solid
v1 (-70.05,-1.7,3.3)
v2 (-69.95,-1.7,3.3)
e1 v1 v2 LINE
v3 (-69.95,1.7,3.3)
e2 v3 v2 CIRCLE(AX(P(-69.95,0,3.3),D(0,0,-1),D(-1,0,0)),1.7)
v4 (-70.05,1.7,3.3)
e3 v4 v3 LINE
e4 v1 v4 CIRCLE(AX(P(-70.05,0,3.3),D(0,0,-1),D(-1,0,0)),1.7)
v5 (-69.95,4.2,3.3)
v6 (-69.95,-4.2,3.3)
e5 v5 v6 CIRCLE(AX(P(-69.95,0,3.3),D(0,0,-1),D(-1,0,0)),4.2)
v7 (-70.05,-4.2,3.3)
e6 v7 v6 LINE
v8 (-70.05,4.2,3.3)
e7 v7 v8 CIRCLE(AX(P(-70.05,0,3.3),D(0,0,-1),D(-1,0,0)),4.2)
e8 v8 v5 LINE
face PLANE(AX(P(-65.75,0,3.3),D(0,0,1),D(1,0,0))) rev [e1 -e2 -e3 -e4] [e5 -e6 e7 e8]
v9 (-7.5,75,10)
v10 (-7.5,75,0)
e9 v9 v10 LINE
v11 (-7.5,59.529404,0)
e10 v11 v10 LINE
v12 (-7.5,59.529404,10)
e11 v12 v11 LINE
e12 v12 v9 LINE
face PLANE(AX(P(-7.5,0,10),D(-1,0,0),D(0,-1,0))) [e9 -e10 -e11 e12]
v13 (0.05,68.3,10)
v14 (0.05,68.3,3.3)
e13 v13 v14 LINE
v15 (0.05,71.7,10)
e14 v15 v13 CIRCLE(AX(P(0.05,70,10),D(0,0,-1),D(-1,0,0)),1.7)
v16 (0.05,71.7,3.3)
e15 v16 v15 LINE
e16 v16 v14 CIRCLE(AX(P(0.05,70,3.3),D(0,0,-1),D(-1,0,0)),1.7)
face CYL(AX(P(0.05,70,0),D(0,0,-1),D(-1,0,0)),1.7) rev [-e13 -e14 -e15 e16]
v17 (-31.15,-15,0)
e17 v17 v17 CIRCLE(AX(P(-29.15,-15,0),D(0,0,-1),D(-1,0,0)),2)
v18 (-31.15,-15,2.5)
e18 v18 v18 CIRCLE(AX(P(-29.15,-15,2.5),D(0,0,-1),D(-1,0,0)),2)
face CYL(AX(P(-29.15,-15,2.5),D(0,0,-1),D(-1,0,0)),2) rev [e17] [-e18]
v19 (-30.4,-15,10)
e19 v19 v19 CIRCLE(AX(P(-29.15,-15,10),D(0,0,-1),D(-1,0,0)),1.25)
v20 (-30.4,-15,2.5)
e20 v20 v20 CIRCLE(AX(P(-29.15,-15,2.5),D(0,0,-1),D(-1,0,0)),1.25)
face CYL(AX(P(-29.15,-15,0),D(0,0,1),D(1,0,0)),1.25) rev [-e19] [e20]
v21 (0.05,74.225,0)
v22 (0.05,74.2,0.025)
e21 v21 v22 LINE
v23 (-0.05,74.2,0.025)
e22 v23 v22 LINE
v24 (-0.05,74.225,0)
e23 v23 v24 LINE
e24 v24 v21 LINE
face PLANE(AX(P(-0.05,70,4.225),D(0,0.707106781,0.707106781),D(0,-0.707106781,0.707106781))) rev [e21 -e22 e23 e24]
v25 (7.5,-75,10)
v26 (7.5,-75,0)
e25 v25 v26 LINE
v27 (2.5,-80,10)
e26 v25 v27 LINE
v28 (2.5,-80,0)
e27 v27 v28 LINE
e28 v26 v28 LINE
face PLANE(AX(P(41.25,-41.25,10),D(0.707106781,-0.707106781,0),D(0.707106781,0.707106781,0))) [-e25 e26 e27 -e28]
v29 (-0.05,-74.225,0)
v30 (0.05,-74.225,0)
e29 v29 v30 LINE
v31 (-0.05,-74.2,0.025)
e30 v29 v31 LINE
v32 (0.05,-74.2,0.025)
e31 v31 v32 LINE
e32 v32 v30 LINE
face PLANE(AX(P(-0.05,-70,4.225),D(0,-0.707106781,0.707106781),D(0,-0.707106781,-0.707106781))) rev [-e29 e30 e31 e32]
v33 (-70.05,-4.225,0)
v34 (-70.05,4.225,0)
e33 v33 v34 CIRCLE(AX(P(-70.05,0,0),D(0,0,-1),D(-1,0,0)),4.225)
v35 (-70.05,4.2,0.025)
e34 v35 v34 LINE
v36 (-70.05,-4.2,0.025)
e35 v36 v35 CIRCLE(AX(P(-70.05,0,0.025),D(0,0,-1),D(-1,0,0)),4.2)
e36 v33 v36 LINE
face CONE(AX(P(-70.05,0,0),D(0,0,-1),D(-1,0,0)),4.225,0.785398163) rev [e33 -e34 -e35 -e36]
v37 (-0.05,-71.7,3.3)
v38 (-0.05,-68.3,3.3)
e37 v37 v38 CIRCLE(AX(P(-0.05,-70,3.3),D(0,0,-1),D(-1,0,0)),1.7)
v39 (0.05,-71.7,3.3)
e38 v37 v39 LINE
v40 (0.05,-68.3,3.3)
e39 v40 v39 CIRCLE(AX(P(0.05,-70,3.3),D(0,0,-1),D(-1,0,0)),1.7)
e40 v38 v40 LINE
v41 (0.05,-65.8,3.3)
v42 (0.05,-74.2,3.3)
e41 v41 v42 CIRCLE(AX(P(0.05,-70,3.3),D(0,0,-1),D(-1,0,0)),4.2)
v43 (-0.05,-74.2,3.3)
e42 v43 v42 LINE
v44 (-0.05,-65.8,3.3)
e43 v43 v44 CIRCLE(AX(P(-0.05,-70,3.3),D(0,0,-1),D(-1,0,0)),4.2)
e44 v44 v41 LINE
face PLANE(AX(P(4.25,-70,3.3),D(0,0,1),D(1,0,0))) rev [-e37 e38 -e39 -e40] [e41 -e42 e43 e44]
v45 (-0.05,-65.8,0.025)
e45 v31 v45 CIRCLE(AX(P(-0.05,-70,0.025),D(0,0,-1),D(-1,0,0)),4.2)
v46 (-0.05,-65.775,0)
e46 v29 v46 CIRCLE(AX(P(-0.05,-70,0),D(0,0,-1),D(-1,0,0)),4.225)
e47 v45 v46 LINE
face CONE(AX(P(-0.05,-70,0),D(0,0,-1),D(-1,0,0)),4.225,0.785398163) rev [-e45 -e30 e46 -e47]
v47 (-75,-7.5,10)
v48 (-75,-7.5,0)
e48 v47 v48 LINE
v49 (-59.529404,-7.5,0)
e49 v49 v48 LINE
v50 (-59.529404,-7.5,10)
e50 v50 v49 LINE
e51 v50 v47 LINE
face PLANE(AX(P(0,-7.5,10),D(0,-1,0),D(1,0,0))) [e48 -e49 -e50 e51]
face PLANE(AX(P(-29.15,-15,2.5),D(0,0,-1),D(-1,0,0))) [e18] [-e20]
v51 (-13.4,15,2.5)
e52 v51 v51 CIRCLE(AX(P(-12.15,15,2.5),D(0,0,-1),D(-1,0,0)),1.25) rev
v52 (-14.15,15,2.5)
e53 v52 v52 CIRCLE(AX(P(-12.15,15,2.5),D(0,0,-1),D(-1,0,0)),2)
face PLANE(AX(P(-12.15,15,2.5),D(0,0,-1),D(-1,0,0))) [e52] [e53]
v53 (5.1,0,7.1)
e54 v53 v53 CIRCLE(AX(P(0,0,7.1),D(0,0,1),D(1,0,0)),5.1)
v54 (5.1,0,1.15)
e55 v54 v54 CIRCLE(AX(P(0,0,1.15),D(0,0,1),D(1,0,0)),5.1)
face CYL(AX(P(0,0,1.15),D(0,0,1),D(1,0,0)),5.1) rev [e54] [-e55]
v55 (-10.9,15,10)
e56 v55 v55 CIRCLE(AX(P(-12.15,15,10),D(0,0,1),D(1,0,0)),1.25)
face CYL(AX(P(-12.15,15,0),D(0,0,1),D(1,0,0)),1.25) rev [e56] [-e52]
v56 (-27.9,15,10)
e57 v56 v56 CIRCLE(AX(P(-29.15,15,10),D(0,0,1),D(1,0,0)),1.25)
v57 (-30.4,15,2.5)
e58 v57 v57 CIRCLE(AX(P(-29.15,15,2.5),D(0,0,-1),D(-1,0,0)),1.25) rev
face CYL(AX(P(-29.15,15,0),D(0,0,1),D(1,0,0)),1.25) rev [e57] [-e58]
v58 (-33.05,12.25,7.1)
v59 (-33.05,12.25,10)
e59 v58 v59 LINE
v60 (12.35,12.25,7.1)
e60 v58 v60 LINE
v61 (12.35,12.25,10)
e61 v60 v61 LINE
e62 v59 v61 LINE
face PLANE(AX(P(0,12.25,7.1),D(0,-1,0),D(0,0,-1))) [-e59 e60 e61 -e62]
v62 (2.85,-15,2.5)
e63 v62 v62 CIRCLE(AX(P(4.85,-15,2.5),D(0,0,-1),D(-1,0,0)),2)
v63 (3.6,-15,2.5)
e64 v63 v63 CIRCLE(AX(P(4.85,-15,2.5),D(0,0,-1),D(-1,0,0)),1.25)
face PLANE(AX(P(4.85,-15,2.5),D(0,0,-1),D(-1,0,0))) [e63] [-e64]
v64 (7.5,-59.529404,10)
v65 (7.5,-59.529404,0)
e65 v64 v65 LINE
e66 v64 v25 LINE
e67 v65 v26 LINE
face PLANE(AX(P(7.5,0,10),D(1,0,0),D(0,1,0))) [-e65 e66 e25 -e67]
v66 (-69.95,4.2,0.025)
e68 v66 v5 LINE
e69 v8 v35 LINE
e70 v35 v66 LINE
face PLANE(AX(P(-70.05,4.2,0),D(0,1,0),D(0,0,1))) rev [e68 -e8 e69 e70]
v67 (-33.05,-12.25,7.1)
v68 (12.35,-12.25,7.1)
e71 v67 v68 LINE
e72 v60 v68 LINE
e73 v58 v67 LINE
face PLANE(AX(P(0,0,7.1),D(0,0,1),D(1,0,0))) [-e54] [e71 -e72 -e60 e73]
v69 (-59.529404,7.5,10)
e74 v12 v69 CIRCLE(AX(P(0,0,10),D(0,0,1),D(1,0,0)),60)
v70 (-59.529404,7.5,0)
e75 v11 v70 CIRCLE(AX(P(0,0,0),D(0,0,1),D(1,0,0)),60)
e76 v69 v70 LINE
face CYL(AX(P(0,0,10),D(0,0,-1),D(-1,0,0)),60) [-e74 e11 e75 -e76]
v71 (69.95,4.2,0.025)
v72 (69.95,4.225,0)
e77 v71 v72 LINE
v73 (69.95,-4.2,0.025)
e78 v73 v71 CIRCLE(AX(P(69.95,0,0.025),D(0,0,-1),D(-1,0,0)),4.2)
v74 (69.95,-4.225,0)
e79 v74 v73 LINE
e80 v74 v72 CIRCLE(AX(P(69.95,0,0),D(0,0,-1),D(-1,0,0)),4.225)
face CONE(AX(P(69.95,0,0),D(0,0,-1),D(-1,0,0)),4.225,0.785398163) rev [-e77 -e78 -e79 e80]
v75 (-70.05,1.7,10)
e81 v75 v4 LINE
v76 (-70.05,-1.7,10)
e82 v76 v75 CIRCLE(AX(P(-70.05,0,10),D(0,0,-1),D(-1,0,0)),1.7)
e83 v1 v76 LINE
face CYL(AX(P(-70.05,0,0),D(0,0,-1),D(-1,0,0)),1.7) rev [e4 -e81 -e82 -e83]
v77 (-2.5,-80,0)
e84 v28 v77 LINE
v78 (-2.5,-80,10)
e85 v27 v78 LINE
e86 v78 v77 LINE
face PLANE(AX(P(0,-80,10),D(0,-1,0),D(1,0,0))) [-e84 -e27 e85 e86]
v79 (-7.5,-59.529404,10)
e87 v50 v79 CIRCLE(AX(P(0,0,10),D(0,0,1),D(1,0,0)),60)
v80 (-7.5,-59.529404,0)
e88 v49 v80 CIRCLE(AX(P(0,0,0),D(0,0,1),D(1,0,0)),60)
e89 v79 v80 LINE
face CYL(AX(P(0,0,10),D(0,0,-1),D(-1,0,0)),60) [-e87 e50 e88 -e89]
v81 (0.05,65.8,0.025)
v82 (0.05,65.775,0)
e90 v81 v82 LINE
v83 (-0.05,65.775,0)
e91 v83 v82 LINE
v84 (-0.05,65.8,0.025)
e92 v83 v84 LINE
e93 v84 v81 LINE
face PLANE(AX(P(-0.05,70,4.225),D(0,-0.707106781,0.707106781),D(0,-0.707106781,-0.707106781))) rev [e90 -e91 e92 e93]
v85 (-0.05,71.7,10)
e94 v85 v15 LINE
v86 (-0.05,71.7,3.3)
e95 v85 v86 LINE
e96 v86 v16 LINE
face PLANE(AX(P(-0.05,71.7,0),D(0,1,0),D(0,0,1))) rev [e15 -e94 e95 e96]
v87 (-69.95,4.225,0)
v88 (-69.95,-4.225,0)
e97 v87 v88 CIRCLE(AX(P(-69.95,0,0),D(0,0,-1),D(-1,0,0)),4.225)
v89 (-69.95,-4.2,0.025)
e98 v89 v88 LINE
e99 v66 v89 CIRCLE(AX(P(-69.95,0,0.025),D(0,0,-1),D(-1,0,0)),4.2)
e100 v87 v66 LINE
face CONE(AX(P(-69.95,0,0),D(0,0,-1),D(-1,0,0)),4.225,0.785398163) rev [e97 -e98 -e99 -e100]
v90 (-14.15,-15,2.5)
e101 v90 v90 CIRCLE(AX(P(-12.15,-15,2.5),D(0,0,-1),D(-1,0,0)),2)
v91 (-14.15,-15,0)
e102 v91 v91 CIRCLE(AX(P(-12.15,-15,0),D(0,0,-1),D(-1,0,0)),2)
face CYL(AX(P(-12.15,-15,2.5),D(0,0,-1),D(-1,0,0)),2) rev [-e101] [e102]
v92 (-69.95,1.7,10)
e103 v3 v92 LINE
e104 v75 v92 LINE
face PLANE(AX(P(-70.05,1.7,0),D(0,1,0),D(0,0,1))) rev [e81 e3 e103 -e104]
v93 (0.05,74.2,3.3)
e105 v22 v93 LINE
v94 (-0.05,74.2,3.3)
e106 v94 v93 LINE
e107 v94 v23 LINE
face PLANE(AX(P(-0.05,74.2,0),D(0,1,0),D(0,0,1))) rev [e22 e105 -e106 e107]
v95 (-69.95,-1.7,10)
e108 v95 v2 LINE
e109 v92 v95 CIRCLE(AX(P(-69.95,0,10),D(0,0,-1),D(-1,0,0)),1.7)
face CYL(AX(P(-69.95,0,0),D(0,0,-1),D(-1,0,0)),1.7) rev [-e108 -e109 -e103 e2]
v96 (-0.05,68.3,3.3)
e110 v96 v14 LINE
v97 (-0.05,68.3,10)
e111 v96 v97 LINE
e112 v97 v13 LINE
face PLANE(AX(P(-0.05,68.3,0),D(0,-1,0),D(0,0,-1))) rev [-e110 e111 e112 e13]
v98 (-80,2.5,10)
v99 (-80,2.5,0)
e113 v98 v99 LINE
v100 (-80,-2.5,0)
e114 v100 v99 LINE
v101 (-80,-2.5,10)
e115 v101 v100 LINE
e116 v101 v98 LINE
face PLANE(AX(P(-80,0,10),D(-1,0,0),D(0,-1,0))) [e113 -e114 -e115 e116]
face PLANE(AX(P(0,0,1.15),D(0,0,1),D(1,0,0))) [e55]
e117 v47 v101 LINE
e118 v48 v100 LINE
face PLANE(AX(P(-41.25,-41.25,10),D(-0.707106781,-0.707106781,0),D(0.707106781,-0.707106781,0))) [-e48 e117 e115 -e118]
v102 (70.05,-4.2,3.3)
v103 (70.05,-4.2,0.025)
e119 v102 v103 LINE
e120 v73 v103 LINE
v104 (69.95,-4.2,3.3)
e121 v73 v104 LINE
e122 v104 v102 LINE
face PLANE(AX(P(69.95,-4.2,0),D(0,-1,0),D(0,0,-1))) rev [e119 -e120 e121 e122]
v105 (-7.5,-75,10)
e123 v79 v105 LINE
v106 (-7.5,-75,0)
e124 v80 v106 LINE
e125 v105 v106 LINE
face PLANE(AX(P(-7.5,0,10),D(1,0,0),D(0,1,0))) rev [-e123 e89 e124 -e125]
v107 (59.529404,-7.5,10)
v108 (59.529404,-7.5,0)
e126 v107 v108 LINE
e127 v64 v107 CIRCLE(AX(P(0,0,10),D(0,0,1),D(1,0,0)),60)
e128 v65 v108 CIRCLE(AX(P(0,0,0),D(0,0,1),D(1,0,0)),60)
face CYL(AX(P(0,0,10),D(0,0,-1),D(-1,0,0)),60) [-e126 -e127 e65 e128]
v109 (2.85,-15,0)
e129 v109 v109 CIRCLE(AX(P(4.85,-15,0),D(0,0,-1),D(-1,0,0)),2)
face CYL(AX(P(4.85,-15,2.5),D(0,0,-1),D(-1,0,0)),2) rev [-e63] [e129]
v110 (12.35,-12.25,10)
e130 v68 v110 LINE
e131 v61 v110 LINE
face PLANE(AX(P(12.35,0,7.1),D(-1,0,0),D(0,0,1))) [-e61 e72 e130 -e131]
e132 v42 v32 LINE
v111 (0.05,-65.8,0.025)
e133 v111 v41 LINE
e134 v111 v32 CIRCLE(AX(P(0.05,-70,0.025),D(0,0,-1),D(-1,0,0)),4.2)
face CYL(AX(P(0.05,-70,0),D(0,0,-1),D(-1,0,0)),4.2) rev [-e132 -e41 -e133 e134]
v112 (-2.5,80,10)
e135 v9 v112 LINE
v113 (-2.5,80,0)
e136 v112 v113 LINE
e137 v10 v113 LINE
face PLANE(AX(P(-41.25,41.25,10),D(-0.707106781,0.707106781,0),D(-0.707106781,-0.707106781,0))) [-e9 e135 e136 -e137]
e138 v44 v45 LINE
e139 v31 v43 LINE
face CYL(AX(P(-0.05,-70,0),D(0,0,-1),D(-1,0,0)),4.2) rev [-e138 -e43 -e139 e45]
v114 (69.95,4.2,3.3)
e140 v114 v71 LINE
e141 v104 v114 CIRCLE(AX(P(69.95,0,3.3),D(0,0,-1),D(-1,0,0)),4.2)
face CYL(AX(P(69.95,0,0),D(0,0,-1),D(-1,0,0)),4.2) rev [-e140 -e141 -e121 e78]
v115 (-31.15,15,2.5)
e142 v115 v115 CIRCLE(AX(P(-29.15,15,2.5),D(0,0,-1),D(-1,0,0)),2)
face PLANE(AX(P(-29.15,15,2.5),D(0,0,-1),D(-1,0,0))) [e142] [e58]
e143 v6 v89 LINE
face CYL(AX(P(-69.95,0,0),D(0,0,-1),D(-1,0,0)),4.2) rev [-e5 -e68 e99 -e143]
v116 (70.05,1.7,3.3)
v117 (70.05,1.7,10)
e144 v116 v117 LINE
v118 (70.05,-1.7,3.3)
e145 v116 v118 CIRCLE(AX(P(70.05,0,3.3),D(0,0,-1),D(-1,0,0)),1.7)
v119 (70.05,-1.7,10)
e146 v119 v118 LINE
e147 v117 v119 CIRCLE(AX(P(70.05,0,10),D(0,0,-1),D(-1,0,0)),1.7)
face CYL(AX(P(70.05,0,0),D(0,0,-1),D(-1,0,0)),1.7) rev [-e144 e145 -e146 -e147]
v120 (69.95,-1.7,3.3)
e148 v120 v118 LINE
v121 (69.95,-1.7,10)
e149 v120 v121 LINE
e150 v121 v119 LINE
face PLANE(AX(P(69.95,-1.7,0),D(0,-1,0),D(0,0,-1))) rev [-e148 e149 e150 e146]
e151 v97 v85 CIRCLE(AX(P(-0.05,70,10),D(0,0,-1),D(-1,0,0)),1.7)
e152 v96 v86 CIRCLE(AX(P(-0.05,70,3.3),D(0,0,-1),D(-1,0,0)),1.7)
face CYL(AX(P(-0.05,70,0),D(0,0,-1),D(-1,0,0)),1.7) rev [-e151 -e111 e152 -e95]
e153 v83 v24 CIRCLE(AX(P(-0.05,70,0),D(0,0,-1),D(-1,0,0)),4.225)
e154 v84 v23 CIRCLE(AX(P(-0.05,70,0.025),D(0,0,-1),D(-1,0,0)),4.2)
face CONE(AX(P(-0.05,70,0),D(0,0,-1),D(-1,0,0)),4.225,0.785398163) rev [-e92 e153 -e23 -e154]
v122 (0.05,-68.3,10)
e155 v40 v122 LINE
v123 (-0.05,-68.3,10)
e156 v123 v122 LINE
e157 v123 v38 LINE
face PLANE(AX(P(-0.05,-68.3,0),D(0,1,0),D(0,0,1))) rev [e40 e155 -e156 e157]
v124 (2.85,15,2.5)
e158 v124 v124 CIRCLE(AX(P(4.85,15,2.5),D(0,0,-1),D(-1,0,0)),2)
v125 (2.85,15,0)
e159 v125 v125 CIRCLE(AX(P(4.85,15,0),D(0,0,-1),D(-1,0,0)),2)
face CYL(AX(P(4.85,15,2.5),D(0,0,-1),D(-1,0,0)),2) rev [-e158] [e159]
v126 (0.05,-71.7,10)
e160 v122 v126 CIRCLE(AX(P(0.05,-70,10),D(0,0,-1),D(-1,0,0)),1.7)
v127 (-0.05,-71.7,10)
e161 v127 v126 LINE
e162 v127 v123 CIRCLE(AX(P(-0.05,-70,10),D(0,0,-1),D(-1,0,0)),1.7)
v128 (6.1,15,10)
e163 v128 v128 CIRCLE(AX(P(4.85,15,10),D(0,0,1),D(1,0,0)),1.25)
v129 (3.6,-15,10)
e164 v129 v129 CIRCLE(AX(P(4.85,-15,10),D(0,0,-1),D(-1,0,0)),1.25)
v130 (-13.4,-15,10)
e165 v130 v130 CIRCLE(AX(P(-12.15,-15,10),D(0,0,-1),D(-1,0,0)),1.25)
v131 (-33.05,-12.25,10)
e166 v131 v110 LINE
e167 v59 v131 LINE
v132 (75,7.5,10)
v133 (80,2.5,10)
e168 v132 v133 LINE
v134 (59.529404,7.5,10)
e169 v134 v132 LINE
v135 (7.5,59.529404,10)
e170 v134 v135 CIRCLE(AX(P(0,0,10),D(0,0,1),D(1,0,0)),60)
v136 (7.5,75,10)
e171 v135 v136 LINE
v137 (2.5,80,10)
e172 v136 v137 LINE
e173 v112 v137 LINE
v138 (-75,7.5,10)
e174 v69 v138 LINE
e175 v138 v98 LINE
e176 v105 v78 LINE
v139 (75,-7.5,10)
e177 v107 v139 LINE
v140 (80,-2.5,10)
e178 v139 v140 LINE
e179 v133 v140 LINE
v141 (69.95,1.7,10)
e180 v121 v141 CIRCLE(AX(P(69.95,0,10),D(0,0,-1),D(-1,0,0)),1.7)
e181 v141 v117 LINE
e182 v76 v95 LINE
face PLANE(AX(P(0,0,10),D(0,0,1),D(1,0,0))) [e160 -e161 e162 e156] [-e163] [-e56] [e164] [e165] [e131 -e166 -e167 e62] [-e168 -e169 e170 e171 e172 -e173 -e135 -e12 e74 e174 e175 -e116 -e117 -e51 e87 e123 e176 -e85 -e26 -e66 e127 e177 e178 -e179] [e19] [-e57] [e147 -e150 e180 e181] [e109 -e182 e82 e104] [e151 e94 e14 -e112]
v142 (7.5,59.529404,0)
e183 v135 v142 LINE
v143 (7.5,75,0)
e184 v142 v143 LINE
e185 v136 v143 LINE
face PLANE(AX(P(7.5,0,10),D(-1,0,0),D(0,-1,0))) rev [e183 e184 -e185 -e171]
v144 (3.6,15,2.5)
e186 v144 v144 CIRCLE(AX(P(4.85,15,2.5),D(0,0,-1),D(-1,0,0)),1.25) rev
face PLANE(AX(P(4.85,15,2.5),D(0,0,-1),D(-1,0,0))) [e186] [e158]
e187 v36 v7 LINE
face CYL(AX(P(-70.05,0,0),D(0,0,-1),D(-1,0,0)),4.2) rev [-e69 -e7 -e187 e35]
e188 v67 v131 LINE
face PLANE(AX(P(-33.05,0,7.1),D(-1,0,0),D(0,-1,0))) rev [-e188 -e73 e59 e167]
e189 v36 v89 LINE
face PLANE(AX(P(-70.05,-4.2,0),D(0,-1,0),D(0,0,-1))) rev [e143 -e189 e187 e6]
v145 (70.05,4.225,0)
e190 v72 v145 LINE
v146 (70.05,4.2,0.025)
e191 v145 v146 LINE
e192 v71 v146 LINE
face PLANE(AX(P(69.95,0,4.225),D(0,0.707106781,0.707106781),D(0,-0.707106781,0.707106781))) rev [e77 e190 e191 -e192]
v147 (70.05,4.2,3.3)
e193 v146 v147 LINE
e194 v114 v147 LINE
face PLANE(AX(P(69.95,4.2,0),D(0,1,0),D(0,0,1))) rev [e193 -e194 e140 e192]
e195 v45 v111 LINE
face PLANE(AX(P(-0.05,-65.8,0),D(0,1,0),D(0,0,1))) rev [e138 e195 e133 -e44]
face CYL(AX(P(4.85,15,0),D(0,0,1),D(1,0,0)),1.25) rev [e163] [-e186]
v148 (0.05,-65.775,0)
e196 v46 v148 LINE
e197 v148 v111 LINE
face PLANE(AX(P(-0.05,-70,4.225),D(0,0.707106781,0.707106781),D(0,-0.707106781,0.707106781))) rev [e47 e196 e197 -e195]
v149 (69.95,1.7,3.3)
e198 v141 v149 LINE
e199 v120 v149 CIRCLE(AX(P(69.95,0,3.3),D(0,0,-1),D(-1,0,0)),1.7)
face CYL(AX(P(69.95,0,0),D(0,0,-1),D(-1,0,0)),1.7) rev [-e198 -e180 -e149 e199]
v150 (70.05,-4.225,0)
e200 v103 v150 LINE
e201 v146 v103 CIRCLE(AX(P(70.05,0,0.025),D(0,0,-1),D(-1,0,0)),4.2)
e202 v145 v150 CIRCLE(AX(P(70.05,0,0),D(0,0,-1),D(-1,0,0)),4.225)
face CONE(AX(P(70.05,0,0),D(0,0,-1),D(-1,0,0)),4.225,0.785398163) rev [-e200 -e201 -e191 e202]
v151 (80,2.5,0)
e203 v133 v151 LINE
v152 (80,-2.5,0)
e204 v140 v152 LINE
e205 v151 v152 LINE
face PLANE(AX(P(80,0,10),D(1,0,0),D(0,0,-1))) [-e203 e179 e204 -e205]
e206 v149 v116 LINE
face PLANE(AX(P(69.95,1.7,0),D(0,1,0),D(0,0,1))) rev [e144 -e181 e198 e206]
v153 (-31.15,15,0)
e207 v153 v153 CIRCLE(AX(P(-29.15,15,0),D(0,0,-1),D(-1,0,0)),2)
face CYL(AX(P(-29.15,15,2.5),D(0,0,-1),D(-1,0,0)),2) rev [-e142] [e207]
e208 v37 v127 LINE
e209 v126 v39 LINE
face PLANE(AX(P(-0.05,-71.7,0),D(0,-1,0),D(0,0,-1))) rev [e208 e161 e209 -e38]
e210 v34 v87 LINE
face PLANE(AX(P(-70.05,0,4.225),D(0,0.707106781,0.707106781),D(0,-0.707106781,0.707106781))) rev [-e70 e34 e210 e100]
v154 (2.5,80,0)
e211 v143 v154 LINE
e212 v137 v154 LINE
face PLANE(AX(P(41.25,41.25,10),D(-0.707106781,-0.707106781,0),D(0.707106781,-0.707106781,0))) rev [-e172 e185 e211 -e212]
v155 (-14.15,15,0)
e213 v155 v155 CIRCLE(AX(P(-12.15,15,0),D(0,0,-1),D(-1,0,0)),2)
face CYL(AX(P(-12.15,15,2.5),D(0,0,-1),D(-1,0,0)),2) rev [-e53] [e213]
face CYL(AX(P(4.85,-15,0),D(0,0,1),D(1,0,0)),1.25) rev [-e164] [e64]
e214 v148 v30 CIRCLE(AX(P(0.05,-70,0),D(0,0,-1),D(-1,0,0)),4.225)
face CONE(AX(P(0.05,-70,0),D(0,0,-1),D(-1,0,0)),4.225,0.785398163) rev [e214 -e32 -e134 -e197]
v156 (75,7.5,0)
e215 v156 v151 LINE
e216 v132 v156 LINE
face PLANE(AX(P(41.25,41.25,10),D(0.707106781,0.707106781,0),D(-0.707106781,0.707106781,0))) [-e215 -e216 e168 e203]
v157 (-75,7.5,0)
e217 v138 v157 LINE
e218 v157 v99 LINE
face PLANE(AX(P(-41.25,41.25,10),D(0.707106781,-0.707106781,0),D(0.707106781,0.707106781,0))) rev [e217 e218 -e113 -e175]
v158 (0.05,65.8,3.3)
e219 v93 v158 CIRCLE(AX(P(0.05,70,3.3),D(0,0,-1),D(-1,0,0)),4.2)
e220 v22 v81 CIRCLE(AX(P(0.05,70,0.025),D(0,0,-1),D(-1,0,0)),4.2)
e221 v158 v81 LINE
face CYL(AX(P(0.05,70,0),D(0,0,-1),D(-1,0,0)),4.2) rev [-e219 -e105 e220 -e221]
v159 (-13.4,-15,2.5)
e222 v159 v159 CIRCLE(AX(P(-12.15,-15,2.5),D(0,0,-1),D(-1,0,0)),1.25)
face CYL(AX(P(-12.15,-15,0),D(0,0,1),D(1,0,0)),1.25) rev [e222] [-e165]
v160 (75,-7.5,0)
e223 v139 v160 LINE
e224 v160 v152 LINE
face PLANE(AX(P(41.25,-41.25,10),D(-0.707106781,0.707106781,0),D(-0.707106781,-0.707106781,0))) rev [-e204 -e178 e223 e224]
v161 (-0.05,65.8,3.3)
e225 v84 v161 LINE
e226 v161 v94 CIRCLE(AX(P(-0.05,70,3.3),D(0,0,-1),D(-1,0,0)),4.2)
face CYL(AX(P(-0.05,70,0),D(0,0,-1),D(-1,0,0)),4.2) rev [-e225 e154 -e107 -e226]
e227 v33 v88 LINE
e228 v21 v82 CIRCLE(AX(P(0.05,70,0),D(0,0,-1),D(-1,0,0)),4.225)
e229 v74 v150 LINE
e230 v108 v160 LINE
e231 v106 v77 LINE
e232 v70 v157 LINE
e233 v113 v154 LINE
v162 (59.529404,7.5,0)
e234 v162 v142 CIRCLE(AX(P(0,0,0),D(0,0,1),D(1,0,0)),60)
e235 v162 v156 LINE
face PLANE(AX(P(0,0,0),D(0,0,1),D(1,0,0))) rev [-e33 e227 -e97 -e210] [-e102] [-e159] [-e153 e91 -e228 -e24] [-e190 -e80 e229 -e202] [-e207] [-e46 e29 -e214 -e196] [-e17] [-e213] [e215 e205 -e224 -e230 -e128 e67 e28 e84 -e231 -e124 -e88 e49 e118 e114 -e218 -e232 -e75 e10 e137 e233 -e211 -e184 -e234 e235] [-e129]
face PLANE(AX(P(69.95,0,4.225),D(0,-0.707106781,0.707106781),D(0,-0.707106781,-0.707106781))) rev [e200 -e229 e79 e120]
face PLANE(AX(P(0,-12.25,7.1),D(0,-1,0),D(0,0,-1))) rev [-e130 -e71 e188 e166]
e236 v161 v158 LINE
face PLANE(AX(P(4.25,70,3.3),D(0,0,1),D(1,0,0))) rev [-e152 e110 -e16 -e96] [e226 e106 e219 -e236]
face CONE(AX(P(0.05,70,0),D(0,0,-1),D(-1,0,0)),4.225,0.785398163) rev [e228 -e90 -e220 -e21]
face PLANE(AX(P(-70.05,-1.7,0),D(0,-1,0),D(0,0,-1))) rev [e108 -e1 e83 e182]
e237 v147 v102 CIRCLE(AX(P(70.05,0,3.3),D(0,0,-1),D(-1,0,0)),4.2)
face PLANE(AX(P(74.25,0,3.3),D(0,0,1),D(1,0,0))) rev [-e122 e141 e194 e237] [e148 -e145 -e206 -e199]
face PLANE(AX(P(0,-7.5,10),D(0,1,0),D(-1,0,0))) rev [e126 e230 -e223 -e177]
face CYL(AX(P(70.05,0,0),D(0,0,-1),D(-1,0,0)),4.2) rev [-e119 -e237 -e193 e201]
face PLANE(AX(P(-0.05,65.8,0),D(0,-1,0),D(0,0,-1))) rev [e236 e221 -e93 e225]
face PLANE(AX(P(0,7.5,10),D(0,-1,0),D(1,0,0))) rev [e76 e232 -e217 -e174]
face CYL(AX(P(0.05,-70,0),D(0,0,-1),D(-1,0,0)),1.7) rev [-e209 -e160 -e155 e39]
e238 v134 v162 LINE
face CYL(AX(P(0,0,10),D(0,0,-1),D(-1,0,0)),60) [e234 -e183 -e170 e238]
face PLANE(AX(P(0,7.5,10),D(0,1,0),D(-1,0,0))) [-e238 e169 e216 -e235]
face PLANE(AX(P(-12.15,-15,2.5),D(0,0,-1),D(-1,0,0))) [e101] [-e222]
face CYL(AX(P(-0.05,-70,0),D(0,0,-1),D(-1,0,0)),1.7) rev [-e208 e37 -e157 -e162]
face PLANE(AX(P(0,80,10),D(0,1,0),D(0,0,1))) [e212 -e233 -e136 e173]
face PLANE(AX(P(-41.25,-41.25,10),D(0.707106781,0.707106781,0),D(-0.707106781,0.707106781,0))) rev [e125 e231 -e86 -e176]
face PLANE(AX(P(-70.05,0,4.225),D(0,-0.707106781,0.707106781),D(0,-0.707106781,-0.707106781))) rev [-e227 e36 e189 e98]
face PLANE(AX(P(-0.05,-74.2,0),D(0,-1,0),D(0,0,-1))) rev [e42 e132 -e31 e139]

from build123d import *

# Parameters (mm, degrees)
BOSS_EXTRUDE1_DEPTH                            = 10
CBORE_START                                    = -1
CBORE_SLOT_FOR_M3_HEX_HEAD_MACHINE_SCREW_DEPTH = 4.3
CBORE_START_2                                  = 3.3
CBORE_SLOT_FOR_M3_HEX_HEAD_MACHINE_S_3_DEPTH   = 7.7
SKETCH12_R                                     = 1.25
CUT_EXTRUDE4_DEPTH                             = 114.578166925
SKETCH12_5_R                                   = 5.1
CUT_EXTRUDE5_DEPTH                             = 8.85
SKETCH12_6_W                                   = 45.4
SKETCH12_6_H                                   = 24.5
CUT_EXTRUDE6_DEPTH                             = 2.9
SKETCH16_R                                     = 2
CUT_EXTRUDE7_DEPTH                             = 2.5


with BuildPart() as part:
    # Sketch1 → Boss-Extrude1 (new body)
    with BuildSketch(Plane.XY):
        with BuildLine():
            Line((-59.529404499, 7.5), (-75, 7.5))
            Line((-75, 7.5), (-80, 2.5))
            Line((-80, 2.5), (-80, -2.5))
            Line((-80, -2.5), (-75, -7.5))
            Line((-75, -7.5), (-59.529404499, -7.5))
            ThreePointArc((-59.529404499, -7.5), (-42.426406871, -42.426406871), (-7.5, -59.529404499))
            Line((-7.5, -59.529404499), (-7.5, -75))
            Line((-7.5, -75), (-2.5, -80))
            Line((-2.5, -80), (2.5, -80))
            Line((2.5, -80), (7.5, -75))
            Line((7.5, -75), (7.5, -59.529404499))
            ThreePointArc((7.5, -59.529404499), (42.426406871, -42.426406871), (59.529404499, -7.5))
            Line((59.529404499, -7.5), (75, -7.5))
            Line((75, -7.5), (80, -2.5))
            Line((80, -2.5), (80, 2.5))
            Line((80, 2.5), (75, 7.5))
            Line((75, 7.5), (59.529404499, 7.5))
            ThreePointArc((59.529404499, 7.5), (42.426406871, 42.426406871), (7.5, 59.529404499))
            Line((7.5, 59.529404499), (7.5, 75))
            Line((7.5, 75), (2.5, 80))
            Line((2.5, 80), (-2.5, 80))
            Line((-2.5, 80), (-7.5, 75))
            Line((-7.5, 75), (-7.5, 59.529404499))
            ThreePointArc((-7.5, 59.529404499), (-42.426406871, 42.426406871), (-59.529404499, 7.5))
        make_face()
    extrude(amount=BOSS_EXTRUDE1_DEPTH)

    # CBORE SLOT for M3 Hex Head Machine Screw1: read off the stored shape, not the designer's step
    # CBORE SLOT for M3 Hex Head Machine S 2 → CBORE SLOT for M3 Hex Head Machine Screw1 (cut)
    with BuildSketch(Plane.XY.offset(CBORE_START)):
        with BuildLine():
            ThreePointArc((0.05, 65.8), (4.25, 70), (0.05, 74.2))
            Line((0.05, 74.2), (-0.05, 74.2))
            ThreePointArc((-0.05, 74.2), (-4.25, 70), (-0.05, 65.8))
            Line((-0.05, 65.8), (0.05, 65.8))
        make_face()
        with BuildLine():
            ThreePointArc((-69.95, -4.2), (-65.75, 0), (-69.95, 4.2))
            Line((-69.95, 4.2), (-70.05, 4.2))
            ThreePointArc((-70.05, 4.2), (-74.25, 0), (-70.05, -4.2))
            Line((-70.05, -4.2), (-69.95, -4.2))
        make_face()
        with BuildLine():
            ThreePointArc((69.95, 4.2), (65.75, 0), (69.95, -4.2))
            Line((69.95, -4.2), (70.05, -4.2))
            ThreePointArc((70.05, -4.2), (74.25, 0), (70.05, 4.2))
            Line((70.05, 4.2), (69.95, 4.2))
        make_face()
        with BuildLine():
            ThreePointArc((0.05, -74.2), (4.25, -70), (0.05, -65.8))
            Line((0.05, -65.8), (-0.05, -65.8))
            ThreePointArc((-0.05, -65.8), (-4.25, -70), (-0.05, -74.2))
            Line((-0.05, -74.2), (0.05, -74.2))
        make_face()
    extrude(amount=CBORE_SLOT_FOR_M3_HEX_HEAD_MACHINE_SCREW_DEPTH, mode=Mode.SUBTRACT)

    # CBORE SLOT for M3 Hex Head Machine S 3 o → CBORE SLOT for M3 Hex Head Machine S 3 (cut)
    with BuildSketch(Plane.XY.offset(CBORE_START_2)):
        with BuildLine():
            ThreePointArc((0.05, 68.3), (1.75, 70), (0.05, 71.7))
            Line((0.05, 71.7), (-0.05, 71.7))
            ThreePointArc((-0.05, 71.7), (-1.75, 70), (-0.05, 68.3))
            Line((-0.05, 68.3), (0.05, 68.3))
        make_face()
        with BuildLine():
            ThreePointArc((-69.95, -1.7), (-68.25, 0), (-69.95, 1.7))
            Line((-69.95, 1.7), (-70.05, 1.7))
            ThreePointArc((-70.05, 1.7), (-71.75, 0), (-70.05, -1.7))
            Line((-70.05, -1.7), (-69.95, -1.7))
        make_face()
        with BuildLine():
            ThreePointArc((69.95, 1.7), (68.25, 0), (69.95, -1.7))
            Line((69.95, -1.7), (70.05, -1.7))
            ThreePointArc((70.05, -1.7), (71.75, 0), (70.05, 1.7))
            Line((70.05, 1.7), (69.95, 1.7))
        make_face()
        with BuildLine():
            ThreePointArc((0.05, -71.7), (1.75, -70), (0.05, -68.3))
            Line((0.05, -68.3), (-0.05, -68.3))
            ThreePointArc((-0.05, -68.3), (-1.75, -70), (-0.05, -71.7))
            Line((-0.05, -71.7), (0.05, -71.7))
        make_face()
    extrude(amount=CBORE_SLOT_FOR_M3_HEX_HEAD_MACHINE_S_3_DEPTH, mode=Mode.SUBTRACT)

    # CBORE SLOT for M3 Hex Head Machine S 4: loft between two sections, ruled curve by curve
    cbore_slot_for_m3_hex_head_machine_s_4_from = [
        Edge.make_three_point_arc((0.05, 74.2, 0.025), (3.019848481, 72.969848481, 0.025), (4.25, 70, 0.025)),
        Edge.make_three_point_arc((4.25, 70, 0.025), (3.019848481, 67.030151519, 0.025), (0.05, 65.8, 0.025)),
        Edge.make_three_point_arc((-0.05, 65.8, 0.025), (-3.019848481, 67.030151519, 0.025), (-4.25, 70, 0.025)),
        Edge.make_three_point_arc((-4.25, 70, 0.025), (-3.019848481, 72.969848481, 0.025), (-0.05, 74.2, 0.025)),
        Edge.make_line((0.05, 65.8, 0.025), (-0.05, 65.8, 0.025)),
        Edge.make_line((0.05, 74.2, 0.025), (-0.05, 74.2, 0.025)),
    ]
    cbore_slot_for_m3_hex_head_machine_s_4_to = [
        Edge.make_three_point_arc((0.05, 74.225, 0), (3.037526151, 72.987526151, 0), (4.275, 70, 0)),
        Edge.make_three_point_arc((4.275, 70, 0), (3.037526151, 67.012473849, 0), (0.05, 65.775, 0)),
        Edge.make_three_point_arc((-0.05, 65.775, 0), (-3.037526151, 67.012473849, 0), (-4.275, 70, 0)),
        Edge.make_three_point_arc((-4.275, 70, 0), (-3.037526151, 72.987526151, 0), (-0.05, 74.225, 0)),
        Edge.make_line((0.05, 65.775, 0), (-0.05, 65.775, 0)),
        Edge.make_line((0.05, 74.225, 0), (-0.05, 74.225, 0)),
    ]
    cbore_slot_for_m3_hex_head_machine_s_4 = Solid(Shell([*[Face.make_surface_from_curves(cbore_slot_for_m3_hex_head_machine_s_4_from[k], cbore_slot_for_m3_hex_head_machine_s_4_to[k]) for k in range(6)], Face(Wire(cbore_slot_for_m3_hex_head_machine_s_4_from)), Face(Wire(cbore_slot_for_m3_hex_head_machine_s_4_to))]))
    add(cbore_slot_for_m3_hex_head_machine_s_4, mode=Mode.SUBTRACT)

    # CBORE SLOT for M3 Hex Head Machine S 5: loft between two sections, ruled curve by curve
    cbore_slot_for_m3_hex_head_machine_s_5_from = [
        Edge.make_three_point_arc((-69.95, 4.2, 0.025), (-66.980151519, 2.969848481, 0.025), (-65.75, 0, 0.025)),
        Edge.make_three_point_arc((-65.75, 0, 0.025), (-66.980151519, -2.969848481, 0.025), (-69.95, -4.2, 0.025)),
        Edge.make_three_point_arc((-70.05, -4.2, 0.025), (-73.019848481, -2.969848481, 0.025), (-74.25, 0, 0.025)),
        Edge.make_three_point_arc((-74.25, 0, 0.025), (-73.019848481, 2.969848481, 0.025), (-70.05, 4.2, 0.025)),
        Edge.make_line((-69.95, -4.2, 0.025), (-70.05, -4.2, 0.025)),
        Edge.make_line((-69.95, 4.2, 0.025), (-70.05, 4.2, 0.025)),
    ]
    cbore_slot_for_m3_hex_head_machine_s_5_to = [
        Edge.make_three_point_arc((-69.95, 4.225, 0), (-66.962473849, 2.987526151, 0), (-65.725, 0, 0)),
        Edge.make_three_point_arc((-65.725, 0, 0), (-66.962473849, -2.987526151, 0), (-69.95, -4.225, 0)),
        Edge.make_three_point_arc((-70.05, -4.225, 0), (-73.037526151, -2.987526151, 0), (-74.275, 0, 0)),
        Edge.make_three_point_arc((-74.275, 0, 0), (-73.037526151, 2.987526151, 0), (-70.05, 4.225, 0)),
        Edge.make_line((-69.95, -4.225, 0), (-70.05, -4.225, 0)),
        Edge.make_line((-69.95, 4.225, 0), (-70.05, 4.225, 0)),
    ]
    cbore_slot_for_m3_hex_head_machine_s_5 = Solid(Shell([*[Face.make_surface_from_curves(cbore_slot_for_m3_hex_head_machine_s_5_from[k], cbore_slot_for_m3_hex_head_machine_s_5_to[k]) for k in range(6)], Face(Wire(cbore_slot_for_m3_hex_head_machine_s_5_from)), Face(Wire(cbore_slot_for_m3_hex_head_machine_s_5_to))]))
    add(cbore_slot_for_m3_hex_head_machine_s_5, mode=Mode.SUBTRACT)

    # CBORE SLOT for M3 Hex Head Machine S 6: loft between two sections, ruled curve by curve
    cbore_slot_for_m3_hex_head_machine_s_6_from = [
        Edge.make_three_point_arc((70.05, 4.2, 0.025), (73.019848481, 2.969848481, 0.025), (74.25, 0, 0.025)),
        Edge.make_three_point_arc((74.25, 0, 0.025), (73.019848481, -2.969848481, 0.025), (70.05, -4.2, 0.025)),
        Edge.make_three_point_arc((69.95, -4.2, 0.025), (66.980151519, -2.969848481, 0.025), (65.75, 0, 0.025)),
        Edge.make_three_point_arc((65.75, 0, 0.025), (66.980151519, 2.969848481, 0.025), (69.95, 4.2, 0.025)),
        Edge.make_line((70.05, -4.2, 0.025), (69.95, -4.2, 0.025)),
        Edge.make_line((70.05, 4.2, 0.025), (69.95, 4.2, 0.025)),
    ]
    cbore_slot_for_m3_hex_head_machine_s_6_to = [
        Edge.make_three_point_arc((70.05, 4.225, 0), (73.037526151, 2.987526151, 0), (74.275, 0, 0)),
        Edge.make_three_point_arc((74.275, 0, 0), (73.037526151, -2.987526151, 0), (70.05, -4.225, 0)),
        Edge.make_three_point_arc((69.95, -4.225, 0), (66.962473849, -2.987526151, 0), (65.725, 0, 0)),
        Edge.make_three_point_arc((65.725, 0, 0), (66.962473849, 2.987526151, 0), (69.95, 4.225, 0)),
        Edge.make_line((70.05, -4.225, 0), (69.95, -4.225, 0)),
        Edge.make_line((70.05, 4.225, 0), (69.95, 4.225, 0)),
    ]
    cbore_slot_for_m3_hex_head_machine_s_6 = Solid(Shell([*[Face.make_surface_from_curves(cbore_slot_for_m3_hex_head_machine_s_6_from[k], cbore_slot_for_m3_hex_head_machine_s_6_to[k]) for k in range(6)], Face(Wire(cbore_slot_for_m3_hex_head_machine_s_6_from)), Face(Wire(cbore_slot_for_m3_hex_head_machine_s_6_to))]))
    add(cbore_slot_for_m3_hex_head_machine_s_6, mode=Mode.SUBTRACT)

    # CBORE SLOT for M3 Hex Head Machine S 7: loft between two sections, ruled curve by curve
    cbore_slot_for_m3_hex_head_machine_s_7_from = [
        Edge.make_three_point_arc((0.05, -65.8, 0.025), (3.019848481, -67.030151519, 0.025), (4.25, -70, 0.025)),
        Edge.make_three_point_arc((4.25, -70, 0.025), (3.019848481, -72.969848481, 0.025), (0.05, -74.2, 0.025)),
        Edge.make_three_point_arc((-0.05, -74.2, 0.025), (-3.019848481, -72.969848481, 0.025), (-4.25, -70, 0.025)),
        Edge.make_three_point_arc((-4.25, -70, 0.025), (-3.019848481, -67.030151519, 0.025), (-0.05, -65.8, 0.025)),
        Edge.make_line((0.05, -74.2, 0.025), (-0.05, -74.2, 0.025)),
        Edge.make_line((0.05, -65.8, 0.025), (-0.05, -65.8, 0.025)),
    ]
    cbore_slot_for_m3_hex_head_machine_s_7_to = [
        Edge.make_three_point_arc((0.05, -65.775, 0), (3.037526151, -67.012473849, 0), (4.275, -70, 0)),
        Edge.make_three_point_arc((4.275, -70, 0), (3.037526151, -72.987526151, 0), (0.05, -74.225, 0)),
        Edge.make_three_point_arc((-0.05, -74.225, 0), (-3.037526151, -72.987526151, 0), (-4.275, -70, 0)),
        Edge.make_three_point_arc((-4.275, -70, 0), (-3.037526151, -67.012473849, 0), (-0.05, -65.775, 0)),
        Edge.make_line((0.05, -74.225, 0), (-0.05, -74.225, 0)),
        Edge.make_line((0.05, -65.775, 0), (-0.05, -65.775, 0)),
    ]
    cbore_slot_for_m3_hex_head_machine_s_7 = Solid(Shell([*[Face.make_surface_from_curves(cbore_slot_for_m3_hex_head_machine_s_7_from[k], cbore_slot_for_m3_hex_head_machine_s_7_to[k]) for k in range(6)], Face(Wire(cbore_slot_for_m3_hex_head_machine_s_7_from)), Face(Wire(cbore_slot_for_m3_hex_head_machine_s_7_to))]))
    add(cbore_slot_for_m3_hex_head_machine_s_7, mode=Mode.SUBTRACT)

    # Sketch12 → Cut-Extrude4 (cut, through all)
    with BuildSketch(Plane.XY.offset(10)):
        with Locations((4.85, 15)):
            Circle(SKETCH12_R)
        with Locations((-12.15, 15)):
            Circle(SKETCH12_R)
        with Locations((-29.15, 15)):
            Circle(SKETCH12_R)
        with Locations(Location((-29.15, -15, 0), (0, 0, 180))):
            Circle(SKETCH12_R)
        with Locations(Location((-12.15, -15, 0), (0, 0, 180))):
            Circle(SKETCH12_R)
        with Locations(Location((4.85, -15, 0), (0, 0, 180))):
            Circle(SKETCH12_R)
    extrude(amount=-CUT_EXTRUDE4_DEPTH, mode=Mode.SUBTRACT)

    # Sketch12<5> → Cut-Extrude5 (cut)
    with BuildSketch(Plane.XY.offset(10)):
        Circle(SKETCH12_5_R)
    extrude(amount=-CUT_EXTRUDE5_DEPTH, mode=Mode.SUBTRACT)

    # Sketch12<6> → Cut-Extrude6 (cut)
    with BuildSketch(Plane.XY.offset(10)):
        with Locations((-10.35, 0)):
            Rectangle(SKETCH12_6_W, SKETCH12_6_H)
    extrude(amount=-CUT_EXTRUDE6_DEPTH, mode=Mode.SUBTRACT)

    # Sketch16 → Cut-Extrude7 (cut)
    with BuildSketch(Plane(origin=(0, 0, 0), x_dir=(-1, 0, 0), z_dir=(0, 0, -1))):
        with Locations((-4.85, 15)):
            Circle(SKETCH16_R)
        with Locations((12.15, 15)):
            Circle(SKETCH16_R)
        with Locations((29.15, 15)):
            Circle(SKETCH16_R)
        with Locations((-4.85, -15)):
            Circle(SKETCH16_R)
        with Locations((12.15, -15)):
            Circle(SKETCH16_R)
        with Locations((29.15, -15)):
            Circle(SKETCH16_R)
    extrude(amount=-CUT_EXTRUDE7_DEPTH, mode=Mode.SUBTRACT)


solid = part.part
